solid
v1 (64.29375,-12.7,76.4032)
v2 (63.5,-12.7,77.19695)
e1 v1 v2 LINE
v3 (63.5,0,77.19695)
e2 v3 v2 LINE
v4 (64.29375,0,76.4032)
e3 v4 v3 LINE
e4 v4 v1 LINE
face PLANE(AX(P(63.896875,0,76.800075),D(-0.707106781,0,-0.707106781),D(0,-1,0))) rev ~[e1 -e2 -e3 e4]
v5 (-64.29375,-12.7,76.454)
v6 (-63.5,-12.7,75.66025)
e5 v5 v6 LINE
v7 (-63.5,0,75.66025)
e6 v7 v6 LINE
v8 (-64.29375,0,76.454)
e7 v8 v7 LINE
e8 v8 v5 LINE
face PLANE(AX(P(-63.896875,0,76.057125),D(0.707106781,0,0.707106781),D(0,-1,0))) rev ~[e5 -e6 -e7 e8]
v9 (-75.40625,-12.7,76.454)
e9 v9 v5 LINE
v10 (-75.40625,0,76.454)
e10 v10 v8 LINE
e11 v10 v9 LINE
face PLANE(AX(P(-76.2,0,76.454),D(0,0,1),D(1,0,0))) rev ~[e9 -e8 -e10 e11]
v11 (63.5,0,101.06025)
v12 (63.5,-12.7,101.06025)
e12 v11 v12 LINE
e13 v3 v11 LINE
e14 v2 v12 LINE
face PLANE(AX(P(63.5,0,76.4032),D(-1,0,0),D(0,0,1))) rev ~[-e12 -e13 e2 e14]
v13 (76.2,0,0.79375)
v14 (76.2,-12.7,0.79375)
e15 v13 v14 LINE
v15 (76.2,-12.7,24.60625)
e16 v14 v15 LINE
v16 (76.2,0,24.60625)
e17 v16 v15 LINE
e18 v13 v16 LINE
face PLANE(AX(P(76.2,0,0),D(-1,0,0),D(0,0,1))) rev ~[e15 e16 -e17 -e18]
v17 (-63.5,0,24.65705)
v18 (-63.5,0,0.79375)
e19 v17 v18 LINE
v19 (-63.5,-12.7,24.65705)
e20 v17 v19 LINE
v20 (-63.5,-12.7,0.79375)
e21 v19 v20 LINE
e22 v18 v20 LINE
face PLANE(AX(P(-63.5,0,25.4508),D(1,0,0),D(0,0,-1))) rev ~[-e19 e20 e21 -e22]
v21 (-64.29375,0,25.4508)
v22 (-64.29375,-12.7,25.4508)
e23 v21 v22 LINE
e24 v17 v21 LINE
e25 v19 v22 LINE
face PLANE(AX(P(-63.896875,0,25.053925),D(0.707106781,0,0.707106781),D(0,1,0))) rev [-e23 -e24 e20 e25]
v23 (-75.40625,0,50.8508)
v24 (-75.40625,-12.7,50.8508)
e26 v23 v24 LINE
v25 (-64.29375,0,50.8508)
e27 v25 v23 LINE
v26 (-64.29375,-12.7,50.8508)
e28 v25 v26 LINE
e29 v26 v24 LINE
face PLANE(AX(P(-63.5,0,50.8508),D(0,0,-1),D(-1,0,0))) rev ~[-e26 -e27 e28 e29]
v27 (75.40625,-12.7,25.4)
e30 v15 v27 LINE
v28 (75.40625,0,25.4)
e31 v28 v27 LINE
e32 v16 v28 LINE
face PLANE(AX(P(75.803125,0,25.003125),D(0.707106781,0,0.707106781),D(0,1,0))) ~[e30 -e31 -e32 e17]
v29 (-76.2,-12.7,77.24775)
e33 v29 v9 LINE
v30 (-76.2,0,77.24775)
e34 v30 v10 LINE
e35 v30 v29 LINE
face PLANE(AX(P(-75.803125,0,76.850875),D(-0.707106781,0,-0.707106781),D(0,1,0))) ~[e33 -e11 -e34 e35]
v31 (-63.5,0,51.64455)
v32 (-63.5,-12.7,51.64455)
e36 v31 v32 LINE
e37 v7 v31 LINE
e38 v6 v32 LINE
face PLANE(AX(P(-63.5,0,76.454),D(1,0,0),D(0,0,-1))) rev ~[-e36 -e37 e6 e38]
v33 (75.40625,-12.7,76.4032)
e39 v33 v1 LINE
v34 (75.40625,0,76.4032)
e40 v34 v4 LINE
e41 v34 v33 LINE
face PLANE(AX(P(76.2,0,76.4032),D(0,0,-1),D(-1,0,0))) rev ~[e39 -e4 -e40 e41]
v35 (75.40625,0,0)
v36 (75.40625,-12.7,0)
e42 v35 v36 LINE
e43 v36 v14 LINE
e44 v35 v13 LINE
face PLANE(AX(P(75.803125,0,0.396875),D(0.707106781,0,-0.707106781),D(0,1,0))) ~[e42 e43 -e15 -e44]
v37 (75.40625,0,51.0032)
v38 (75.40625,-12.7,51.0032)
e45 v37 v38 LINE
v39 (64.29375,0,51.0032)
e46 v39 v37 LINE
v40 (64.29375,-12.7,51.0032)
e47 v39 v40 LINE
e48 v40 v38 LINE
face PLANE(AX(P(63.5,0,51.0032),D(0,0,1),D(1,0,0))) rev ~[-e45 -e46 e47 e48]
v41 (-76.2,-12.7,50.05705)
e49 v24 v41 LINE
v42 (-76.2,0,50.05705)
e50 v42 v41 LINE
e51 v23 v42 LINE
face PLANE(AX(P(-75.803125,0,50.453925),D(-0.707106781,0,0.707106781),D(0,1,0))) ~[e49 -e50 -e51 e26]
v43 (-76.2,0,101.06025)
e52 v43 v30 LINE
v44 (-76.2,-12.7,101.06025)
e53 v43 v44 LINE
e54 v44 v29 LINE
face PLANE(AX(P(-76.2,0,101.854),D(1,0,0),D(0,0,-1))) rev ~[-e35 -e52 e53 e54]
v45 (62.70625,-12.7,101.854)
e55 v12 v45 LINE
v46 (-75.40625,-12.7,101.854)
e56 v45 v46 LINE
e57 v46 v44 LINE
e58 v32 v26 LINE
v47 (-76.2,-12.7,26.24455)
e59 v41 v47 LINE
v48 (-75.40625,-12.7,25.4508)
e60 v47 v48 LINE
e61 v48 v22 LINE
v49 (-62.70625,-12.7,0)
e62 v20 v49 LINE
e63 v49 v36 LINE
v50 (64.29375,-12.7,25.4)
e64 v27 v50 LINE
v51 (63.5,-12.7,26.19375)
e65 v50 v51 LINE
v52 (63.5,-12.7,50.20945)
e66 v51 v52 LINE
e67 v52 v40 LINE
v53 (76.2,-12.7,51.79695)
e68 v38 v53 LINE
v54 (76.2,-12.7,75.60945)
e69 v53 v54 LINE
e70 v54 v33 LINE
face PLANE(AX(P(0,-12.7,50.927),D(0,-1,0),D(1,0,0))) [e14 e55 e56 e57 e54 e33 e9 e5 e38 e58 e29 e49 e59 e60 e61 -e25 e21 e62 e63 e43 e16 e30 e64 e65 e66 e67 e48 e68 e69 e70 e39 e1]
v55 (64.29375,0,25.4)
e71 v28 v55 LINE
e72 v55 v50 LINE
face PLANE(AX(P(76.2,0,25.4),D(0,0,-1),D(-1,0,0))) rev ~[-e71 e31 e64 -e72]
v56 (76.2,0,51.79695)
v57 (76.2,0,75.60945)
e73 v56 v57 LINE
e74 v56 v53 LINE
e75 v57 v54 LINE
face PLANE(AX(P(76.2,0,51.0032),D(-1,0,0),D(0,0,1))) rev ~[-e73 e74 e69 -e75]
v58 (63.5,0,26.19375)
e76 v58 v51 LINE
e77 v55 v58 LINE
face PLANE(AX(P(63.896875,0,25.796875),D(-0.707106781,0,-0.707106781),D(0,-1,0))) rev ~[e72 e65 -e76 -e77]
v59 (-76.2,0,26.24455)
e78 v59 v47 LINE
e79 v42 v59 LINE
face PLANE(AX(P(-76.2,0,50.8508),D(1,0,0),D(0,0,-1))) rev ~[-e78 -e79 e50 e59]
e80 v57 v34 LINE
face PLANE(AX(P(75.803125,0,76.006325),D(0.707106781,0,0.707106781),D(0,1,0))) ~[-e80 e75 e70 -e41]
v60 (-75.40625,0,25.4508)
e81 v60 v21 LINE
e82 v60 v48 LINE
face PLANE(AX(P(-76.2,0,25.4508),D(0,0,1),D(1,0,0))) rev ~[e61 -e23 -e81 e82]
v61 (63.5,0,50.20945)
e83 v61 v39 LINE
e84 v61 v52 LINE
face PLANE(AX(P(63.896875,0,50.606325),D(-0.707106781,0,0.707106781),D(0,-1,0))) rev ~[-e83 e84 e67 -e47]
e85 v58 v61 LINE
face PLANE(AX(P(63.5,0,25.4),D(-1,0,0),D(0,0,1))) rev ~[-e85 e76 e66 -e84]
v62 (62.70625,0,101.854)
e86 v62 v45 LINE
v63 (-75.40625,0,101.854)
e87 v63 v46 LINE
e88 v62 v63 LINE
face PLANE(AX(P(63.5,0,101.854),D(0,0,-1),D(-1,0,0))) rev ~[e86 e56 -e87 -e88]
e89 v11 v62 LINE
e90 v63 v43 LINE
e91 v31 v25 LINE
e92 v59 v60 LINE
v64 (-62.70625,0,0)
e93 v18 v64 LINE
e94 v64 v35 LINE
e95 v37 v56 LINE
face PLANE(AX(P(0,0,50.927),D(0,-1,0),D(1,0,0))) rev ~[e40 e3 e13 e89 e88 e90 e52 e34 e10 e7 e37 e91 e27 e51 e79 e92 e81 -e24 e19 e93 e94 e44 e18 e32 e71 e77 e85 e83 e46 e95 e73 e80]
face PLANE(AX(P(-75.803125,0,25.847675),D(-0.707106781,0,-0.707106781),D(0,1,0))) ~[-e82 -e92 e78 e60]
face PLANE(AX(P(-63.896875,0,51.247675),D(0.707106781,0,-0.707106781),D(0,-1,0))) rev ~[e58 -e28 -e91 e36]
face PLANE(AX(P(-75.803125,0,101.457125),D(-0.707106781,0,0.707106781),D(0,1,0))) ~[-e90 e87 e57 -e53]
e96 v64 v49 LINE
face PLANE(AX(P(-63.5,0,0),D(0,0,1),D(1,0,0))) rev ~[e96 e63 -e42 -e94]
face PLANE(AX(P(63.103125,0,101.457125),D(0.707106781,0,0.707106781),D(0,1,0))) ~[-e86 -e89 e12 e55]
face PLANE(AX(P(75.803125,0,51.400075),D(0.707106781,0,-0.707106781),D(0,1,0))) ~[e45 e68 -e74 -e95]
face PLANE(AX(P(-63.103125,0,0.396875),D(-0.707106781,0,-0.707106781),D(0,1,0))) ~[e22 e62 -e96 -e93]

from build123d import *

# Parameters (mm, degrees)
F1_DEPTH = 12.7
F2_SIZE  = 0.79375


# Not quite as in the source:
# - a feature names something its author has since deleted; it is built from what else it names


with BuildPart() as f1:
    # F0 (on Front) → F1 (new body)
    with BuildSketch(Plane.XZ):
        Polygon((-63.5, 25.4508), (-63.5, 0), (76.2, 0), (76.2, 25.4), (63.5, 25.4), (63.5, 51.0032), (76.2, 51.0032), (76.2, 76.4032), (63.5, 76.4032), (63.5, 101.854), (-76.2, 101.854), (-76.2, 76.454), (-63.5, 76.454), (-63.5, 50.8508), (-76.2, 50.8508), (-76.2, 25.4508), align=None)
    extrude(amount=F1_DEPTH)

    # F2
    f2_edges = [f1.edges().sort_by_distance(p)[0] for p in [
        (-63.5, -6.35, 76.454),
        (-63.5, -6.35, 50.8508),
        (-63.5, -6.35, 25.4508),
        (-63.5, -6.35, 0),
        (63.5, -6.35, 101.854),
        (76.2, -6.35, 76.4032),
        (63.5, -6.35, 76.4032),
        (63.5, -6.35, 25.4),
        (76.2, -6.35, 25.4),
        (76.2, -6.35, 51.0032),
        (63.5, -6.35, 51.0032),
        (-76.2, -6.35, 50.8508),
        (-76.2, -6.35, 25.4508),
        (76.2, -6.35, 0),
        (-76.2, -6.35, 101.854),
        (-76.2, -6.35, 76.454),
    ]]
    chamfer(f2_edges, length=F2_SIZE)


solid = f1.part
